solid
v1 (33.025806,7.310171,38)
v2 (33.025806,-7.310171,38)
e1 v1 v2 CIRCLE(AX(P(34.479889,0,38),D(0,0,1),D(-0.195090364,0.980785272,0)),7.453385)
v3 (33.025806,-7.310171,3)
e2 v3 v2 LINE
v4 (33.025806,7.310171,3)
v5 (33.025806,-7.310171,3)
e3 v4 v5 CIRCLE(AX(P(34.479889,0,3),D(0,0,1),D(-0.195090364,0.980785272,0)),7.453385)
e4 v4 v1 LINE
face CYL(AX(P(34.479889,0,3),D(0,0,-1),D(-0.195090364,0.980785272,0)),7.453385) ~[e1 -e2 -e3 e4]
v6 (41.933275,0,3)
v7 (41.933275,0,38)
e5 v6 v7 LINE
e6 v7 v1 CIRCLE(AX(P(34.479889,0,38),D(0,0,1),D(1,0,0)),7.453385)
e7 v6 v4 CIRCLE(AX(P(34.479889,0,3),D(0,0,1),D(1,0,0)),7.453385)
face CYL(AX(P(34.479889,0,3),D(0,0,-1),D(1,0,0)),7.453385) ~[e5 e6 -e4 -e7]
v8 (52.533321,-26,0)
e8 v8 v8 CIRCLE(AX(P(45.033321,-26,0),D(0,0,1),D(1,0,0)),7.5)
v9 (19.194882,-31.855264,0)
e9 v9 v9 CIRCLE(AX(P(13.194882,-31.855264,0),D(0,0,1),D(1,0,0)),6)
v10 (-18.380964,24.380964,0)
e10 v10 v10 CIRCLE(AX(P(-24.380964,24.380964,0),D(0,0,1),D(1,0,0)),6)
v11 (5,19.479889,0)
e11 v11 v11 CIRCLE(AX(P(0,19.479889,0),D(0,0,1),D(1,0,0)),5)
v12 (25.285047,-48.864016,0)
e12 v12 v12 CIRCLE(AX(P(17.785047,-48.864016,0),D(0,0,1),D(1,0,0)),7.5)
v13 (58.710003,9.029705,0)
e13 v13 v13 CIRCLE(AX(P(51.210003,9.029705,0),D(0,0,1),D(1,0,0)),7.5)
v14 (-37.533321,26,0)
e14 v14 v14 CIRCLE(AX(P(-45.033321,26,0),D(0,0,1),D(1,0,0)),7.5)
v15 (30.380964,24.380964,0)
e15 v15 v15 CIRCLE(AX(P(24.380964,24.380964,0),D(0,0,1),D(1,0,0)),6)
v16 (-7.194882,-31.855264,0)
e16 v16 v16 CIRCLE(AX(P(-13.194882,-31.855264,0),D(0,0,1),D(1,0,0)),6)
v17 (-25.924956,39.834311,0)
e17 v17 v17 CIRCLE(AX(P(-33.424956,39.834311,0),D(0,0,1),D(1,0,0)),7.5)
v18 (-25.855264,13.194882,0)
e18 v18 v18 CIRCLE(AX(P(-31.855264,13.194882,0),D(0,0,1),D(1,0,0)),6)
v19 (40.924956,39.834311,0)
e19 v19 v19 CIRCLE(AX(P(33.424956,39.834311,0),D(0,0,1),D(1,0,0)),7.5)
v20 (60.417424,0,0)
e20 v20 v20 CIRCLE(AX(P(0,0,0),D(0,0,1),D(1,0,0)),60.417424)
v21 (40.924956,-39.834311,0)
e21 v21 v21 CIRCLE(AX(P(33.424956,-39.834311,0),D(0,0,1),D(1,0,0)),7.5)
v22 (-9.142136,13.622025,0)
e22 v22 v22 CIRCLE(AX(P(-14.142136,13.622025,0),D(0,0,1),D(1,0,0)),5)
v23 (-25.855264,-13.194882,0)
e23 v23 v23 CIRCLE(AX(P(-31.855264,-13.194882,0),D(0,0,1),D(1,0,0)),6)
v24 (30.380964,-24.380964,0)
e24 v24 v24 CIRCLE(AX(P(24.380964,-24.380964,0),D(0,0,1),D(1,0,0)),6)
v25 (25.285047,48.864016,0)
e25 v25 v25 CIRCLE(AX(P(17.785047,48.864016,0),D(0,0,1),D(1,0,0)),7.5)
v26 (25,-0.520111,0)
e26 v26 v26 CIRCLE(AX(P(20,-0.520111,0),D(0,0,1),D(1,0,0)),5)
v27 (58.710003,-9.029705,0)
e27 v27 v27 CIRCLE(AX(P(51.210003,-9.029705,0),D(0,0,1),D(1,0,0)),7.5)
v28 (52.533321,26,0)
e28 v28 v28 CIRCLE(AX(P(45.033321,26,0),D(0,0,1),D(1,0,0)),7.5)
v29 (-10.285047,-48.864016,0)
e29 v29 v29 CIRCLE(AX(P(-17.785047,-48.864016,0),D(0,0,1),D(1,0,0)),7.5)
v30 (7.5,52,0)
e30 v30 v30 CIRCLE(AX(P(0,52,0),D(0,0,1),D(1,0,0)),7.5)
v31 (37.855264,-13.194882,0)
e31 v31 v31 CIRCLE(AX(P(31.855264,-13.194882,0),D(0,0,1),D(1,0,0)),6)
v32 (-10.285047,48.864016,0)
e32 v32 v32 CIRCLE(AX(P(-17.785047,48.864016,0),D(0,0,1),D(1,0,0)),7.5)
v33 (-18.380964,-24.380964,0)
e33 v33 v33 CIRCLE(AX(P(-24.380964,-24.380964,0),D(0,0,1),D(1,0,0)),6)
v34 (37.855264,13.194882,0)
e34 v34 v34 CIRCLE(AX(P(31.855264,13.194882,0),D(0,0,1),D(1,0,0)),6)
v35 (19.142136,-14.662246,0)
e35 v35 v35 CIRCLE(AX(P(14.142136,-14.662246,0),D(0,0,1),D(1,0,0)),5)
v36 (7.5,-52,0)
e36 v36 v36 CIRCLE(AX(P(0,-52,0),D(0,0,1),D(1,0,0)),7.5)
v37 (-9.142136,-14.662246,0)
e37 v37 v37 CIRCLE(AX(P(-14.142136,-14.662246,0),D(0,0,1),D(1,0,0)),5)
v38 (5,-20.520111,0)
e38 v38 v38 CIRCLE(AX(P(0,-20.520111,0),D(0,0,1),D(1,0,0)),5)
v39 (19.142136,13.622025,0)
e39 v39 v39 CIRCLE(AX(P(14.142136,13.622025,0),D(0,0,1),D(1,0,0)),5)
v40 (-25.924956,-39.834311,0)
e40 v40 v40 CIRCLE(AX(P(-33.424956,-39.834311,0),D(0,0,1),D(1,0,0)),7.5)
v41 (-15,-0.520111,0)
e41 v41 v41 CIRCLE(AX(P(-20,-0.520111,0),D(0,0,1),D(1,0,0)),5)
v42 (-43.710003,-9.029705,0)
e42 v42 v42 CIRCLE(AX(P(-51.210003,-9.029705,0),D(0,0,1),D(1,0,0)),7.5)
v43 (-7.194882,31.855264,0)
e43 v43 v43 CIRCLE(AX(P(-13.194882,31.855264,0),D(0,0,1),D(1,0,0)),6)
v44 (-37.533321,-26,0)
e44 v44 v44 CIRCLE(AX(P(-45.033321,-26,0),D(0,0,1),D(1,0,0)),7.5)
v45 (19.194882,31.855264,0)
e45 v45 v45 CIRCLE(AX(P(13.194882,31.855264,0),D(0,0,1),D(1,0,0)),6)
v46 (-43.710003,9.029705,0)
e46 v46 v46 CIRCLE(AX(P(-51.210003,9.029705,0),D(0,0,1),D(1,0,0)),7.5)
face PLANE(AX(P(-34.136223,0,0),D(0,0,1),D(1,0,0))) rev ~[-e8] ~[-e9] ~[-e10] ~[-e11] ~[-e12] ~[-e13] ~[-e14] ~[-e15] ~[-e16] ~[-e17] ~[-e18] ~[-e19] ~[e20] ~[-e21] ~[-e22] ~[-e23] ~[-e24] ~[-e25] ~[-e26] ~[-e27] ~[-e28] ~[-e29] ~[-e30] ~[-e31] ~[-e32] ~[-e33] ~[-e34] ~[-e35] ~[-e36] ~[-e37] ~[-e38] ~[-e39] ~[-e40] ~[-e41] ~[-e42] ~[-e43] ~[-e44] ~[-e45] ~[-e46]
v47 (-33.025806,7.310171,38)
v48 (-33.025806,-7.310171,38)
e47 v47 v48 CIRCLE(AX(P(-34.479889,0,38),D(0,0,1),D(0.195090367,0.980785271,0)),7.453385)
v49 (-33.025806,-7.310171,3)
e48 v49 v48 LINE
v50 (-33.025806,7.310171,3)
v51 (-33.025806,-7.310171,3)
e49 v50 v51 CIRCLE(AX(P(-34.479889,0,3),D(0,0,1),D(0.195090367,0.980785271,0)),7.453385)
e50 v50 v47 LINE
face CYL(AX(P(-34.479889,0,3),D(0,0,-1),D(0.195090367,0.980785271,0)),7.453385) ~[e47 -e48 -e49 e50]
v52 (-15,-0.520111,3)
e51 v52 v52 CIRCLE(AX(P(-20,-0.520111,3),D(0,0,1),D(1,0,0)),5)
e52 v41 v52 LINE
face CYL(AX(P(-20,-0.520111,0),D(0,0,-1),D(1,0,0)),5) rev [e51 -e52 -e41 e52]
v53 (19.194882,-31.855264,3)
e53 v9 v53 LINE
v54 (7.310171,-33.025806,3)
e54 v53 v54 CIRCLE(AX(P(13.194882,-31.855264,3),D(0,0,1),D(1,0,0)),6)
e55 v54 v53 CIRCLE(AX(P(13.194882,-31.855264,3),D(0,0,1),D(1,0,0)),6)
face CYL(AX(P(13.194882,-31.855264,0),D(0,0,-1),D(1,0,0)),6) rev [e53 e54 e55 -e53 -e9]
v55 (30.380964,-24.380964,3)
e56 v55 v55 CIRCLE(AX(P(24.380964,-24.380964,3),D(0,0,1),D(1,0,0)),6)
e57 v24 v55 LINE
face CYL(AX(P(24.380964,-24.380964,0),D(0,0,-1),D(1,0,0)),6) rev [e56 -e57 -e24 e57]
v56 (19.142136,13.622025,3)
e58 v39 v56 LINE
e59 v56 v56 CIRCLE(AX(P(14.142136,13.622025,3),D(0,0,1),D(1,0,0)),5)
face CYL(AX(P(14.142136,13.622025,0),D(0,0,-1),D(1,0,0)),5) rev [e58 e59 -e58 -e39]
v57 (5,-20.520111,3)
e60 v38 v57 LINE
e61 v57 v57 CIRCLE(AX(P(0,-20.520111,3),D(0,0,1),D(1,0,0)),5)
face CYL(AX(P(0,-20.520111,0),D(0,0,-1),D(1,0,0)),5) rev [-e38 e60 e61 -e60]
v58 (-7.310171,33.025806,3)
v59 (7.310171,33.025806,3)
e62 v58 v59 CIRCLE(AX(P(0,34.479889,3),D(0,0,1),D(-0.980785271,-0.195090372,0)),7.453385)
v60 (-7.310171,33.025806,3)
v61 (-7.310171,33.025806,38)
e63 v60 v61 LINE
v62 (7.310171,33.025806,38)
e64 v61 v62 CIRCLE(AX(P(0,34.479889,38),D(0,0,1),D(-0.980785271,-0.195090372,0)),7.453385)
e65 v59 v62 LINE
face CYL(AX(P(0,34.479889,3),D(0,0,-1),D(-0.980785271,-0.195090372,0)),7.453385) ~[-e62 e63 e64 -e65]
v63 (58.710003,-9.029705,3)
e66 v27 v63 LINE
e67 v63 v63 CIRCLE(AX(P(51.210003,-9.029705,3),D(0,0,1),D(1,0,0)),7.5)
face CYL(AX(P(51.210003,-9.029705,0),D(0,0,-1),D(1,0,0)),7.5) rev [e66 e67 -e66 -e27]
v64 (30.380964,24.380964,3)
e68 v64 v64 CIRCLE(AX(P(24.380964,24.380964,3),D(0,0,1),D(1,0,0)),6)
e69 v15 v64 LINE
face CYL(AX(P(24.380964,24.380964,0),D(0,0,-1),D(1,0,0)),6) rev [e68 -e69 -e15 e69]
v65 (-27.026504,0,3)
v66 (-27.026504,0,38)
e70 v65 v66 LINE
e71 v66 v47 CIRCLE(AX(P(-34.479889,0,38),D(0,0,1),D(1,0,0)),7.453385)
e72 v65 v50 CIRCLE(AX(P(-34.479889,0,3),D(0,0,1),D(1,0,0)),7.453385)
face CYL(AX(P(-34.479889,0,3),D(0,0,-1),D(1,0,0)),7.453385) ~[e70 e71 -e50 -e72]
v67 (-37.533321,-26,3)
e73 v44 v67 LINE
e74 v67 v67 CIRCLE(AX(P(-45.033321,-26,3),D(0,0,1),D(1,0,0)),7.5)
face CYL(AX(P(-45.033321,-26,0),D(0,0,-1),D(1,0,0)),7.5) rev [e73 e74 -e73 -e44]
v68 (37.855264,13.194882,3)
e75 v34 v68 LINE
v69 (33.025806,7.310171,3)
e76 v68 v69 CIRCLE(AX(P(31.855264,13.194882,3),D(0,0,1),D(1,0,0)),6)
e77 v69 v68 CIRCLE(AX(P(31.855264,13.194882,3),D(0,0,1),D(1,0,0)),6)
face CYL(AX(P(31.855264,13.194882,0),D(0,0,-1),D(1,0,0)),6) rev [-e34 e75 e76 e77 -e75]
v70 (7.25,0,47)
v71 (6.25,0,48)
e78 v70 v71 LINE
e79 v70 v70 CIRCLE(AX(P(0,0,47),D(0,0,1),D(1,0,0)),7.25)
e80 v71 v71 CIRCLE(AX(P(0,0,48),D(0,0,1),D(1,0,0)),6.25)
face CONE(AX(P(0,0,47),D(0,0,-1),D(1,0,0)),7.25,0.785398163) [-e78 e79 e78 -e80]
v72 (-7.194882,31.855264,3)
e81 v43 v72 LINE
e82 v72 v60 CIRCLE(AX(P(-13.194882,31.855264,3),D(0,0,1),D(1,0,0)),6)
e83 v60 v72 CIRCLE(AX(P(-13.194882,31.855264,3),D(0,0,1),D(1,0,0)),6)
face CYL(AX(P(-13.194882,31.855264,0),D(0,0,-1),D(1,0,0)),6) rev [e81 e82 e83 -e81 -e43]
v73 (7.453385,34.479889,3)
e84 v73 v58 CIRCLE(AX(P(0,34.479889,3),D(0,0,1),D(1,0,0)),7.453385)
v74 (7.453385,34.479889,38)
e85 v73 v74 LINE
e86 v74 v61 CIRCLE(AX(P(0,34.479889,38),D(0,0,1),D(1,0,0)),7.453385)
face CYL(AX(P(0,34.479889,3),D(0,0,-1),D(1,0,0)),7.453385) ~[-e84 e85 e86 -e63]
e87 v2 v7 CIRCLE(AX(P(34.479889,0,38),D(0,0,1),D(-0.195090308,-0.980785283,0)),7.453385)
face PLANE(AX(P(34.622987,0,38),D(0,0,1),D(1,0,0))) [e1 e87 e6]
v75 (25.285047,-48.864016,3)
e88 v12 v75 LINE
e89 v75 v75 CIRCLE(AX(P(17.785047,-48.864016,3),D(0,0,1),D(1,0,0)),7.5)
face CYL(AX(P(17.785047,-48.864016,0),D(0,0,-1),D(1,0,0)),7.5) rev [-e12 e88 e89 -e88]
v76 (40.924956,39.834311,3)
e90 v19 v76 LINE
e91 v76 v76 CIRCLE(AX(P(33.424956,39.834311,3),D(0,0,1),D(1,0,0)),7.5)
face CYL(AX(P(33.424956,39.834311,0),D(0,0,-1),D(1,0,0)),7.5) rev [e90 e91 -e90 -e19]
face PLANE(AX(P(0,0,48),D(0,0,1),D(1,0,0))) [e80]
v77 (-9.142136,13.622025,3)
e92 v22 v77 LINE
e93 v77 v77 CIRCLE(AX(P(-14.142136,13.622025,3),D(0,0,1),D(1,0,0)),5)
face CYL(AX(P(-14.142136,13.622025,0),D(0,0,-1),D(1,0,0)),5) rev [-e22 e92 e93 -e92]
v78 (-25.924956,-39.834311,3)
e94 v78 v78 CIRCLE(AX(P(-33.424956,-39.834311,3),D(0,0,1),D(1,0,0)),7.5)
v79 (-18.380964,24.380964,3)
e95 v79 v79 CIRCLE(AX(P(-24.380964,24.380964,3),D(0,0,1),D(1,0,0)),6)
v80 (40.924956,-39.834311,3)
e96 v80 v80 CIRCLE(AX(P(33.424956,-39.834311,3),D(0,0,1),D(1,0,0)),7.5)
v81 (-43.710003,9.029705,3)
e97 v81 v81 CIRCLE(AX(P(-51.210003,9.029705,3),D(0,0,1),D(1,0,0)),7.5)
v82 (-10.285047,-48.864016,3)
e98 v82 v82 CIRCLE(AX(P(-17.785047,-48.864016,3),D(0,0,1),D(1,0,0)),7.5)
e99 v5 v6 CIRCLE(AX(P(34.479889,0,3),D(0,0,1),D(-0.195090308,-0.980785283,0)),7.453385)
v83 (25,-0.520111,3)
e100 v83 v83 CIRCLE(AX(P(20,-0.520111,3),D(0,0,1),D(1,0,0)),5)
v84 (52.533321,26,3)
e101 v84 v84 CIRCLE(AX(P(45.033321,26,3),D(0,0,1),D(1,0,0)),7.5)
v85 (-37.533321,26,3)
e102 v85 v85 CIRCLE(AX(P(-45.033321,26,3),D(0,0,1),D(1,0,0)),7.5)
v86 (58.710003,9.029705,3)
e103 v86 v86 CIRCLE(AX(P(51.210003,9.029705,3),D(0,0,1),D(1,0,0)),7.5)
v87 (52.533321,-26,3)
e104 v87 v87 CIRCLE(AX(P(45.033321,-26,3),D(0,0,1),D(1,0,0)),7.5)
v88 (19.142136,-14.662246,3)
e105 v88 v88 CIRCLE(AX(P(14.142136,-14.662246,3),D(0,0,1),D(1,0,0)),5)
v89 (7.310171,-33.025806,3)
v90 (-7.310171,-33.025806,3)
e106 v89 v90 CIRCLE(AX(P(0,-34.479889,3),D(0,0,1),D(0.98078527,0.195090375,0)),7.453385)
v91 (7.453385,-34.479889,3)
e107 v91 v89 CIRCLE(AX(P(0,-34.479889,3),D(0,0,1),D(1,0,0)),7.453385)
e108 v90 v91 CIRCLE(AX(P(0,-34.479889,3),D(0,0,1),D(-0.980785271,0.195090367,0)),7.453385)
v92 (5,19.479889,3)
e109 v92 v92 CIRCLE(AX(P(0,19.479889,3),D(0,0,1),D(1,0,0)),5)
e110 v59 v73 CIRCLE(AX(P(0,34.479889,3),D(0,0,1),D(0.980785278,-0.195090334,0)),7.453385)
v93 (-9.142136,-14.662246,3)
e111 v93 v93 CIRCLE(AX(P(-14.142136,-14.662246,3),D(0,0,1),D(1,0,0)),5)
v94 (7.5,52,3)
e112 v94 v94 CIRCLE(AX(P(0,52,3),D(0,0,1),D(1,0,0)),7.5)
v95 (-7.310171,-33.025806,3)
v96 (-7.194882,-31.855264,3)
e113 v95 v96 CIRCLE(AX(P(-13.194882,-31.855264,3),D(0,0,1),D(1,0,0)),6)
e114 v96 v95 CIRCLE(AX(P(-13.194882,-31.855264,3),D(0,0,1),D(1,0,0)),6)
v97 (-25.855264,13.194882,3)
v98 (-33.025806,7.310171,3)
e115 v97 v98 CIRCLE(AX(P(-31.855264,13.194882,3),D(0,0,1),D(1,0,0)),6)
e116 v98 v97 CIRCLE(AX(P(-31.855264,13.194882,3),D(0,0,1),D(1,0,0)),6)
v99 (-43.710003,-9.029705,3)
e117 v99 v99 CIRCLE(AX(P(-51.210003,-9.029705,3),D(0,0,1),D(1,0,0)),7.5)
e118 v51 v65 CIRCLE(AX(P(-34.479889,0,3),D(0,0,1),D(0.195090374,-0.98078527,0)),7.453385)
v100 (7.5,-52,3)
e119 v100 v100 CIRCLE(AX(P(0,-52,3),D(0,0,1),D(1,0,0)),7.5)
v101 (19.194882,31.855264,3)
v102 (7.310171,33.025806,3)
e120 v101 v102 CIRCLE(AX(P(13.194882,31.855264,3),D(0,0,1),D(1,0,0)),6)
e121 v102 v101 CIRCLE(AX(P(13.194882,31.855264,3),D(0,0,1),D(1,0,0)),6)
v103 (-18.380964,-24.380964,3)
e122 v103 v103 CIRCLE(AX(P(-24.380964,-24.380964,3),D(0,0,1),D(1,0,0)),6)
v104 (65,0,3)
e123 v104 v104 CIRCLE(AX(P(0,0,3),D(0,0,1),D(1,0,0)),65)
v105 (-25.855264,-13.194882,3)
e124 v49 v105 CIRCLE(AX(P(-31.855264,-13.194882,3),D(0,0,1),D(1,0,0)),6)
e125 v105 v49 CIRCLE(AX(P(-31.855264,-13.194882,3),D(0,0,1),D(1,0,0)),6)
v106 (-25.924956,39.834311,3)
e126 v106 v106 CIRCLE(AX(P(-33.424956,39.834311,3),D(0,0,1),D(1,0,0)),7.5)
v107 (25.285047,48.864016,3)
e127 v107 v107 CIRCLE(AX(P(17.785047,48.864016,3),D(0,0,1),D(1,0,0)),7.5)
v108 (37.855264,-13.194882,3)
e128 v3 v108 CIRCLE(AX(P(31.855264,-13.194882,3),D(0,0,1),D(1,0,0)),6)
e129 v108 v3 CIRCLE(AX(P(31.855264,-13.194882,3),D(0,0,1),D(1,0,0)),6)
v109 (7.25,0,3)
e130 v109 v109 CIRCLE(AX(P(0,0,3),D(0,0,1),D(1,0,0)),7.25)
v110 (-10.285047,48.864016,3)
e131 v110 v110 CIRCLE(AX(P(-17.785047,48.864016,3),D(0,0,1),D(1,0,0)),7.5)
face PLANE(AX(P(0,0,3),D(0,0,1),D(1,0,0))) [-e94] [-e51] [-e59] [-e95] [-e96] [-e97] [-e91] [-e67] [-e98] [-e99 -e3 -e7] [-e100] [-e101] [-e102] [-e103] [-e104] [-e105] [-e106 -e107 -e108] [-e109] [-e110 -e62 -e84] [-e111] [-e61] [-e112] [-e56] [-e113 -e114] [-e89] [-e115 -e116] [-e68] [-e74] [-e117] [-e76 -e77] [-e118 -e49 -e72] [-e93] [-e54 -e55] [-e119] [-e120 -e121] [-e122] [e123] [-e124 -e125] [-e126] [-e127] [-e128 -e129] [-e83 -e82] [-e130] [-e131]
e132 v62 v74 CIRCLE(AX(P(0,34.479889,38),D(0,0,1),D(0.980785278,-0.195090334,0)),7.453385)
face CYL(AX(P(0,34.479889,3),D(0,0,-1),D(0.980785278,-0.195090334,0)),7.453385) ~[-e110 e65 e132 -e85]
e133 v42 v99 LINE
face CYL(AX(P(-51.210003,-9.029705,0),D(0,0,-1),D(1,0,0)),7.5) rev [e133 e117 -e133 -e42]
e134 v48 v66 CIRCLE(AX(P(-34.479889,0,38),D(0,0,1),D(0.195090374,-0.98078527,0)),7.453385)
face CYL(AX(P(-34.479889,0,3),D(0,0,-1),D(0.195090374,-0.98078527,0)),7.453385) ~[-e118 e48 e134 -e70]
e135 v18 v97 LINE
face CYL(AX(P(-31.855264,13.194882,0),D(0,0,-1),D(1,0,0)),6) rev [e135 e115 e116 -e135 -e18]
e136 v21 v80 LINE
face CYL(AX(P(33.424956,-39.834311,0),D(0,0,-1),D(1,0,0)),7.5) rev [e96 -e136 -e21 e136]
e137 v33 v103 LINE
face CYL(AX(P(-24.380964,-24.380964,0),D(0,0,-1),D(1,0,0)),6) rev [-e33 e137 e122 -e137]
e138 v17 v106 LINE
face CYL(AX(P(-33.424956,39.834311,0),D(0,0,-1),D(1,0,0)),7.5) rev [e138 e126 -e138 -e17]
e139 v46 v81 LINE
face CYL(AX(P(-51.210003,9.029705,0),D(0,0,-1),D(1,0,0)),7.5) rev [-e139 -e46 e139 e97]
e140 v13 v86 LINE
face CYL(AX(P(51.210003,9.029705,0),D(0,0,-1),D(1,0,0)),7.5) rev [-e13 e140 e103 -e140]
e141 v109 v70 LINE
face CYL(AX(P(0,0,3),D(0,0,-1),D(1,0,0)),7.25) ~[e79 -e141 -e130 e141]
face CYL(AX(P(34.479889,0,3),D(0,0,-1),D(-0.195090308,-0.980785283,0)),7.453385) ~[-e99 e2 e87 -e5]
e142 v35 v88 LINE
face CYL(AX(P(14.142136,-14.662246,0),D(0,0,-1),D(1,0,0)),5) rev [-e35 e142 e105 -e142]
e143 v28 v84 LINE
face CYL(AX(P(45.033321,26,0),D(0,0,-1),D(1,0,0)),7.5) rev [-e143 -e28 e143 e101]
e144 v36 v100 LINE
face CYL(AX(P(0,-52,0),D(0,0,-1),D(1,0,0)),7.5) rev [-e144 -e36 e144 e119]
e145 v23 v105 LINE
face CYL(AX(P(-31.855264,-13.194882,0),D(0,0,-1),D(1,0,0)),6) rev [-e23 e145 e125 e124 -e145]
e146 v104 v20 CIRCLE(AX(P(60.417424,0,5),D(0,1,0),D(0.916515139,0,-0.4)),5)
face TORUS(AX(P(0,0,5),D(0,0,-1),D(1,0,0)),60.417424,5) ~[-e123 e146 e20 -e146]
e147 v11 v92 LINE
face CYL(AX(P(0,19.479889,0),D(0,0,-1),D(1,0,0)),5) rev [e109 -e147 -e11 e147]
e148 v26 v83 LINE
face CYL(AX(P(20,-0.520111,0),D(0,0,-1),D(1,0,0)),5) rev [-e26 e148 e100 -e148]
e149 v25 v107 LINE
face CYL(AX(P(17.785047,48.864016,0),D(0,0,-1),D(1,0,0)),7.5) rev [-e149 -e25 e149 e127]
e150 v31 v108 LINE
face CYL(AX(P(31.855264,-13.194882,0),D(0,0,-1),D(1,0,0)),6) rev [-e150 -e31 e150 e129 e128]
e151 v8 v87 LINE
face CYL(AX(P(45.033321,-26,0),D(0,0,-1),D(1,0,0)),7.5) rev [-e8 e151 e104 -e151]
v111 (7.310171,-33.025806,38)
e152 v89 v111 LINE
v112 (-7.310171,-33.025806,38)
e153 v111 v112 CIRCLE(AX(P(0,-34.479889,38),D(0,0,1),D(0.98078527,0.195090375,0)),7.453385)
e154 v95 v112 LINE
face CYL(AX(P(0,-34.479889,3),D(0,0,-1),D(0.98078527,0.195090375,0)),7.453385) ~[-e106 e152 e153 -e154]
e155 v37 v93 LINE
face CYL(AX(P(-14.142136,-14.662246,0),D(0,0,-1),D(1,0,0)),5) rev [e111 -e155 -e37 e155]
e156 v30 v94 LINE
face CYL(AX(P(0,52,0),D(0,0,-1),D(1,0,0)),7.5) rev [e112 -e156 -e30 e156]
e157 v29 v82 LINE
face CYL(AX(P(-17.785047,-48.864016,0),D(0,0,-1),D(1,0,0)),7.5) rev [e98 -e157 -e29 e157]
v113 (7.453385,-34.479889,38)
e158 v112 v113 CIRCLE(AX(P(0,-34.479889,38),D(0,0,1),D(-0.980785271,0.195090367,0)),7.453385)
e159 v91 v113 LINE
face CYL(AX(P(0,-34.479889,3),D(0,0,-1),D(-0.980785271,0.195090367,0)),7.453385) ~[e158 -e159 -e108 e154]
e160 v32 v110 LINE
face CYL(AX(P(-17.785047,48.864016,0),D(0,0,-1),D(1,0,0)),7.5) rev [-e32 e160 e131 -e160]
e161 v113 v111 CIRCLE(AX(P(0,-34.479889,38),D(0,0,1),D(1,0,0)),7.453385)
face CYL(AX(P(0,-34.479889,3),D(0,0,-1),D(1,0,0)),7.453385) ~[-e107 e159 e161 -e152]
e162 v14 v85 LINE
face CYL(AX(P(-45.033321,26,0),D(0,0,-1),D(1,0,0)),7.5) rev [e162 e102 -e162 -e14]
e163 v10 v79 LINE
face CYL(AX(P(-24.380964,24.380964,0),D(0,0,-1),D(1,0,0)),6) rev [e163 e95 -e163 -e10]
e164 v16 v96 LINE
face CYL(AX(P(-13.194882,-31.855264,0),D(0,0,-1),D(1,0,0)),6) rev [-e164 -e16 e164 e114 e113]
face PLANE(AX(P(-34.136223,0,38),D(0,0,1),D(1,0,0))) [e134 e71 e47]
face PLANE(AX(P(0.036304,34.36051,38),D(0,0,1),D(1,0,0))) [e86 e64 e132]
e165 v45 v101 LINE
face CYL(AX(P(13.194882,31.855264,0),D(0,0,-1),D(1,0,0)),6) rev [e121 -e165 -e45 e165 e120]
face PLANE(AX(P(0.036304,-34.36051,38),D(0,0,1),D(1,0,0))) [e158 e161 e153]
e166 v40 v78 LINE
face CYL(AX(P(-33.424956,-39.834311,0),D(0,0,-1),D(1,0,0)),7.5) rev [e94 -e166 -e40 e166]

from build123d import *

# Parameters (mm, degrees)
F0_R     = 65
F0_R_2   = 7.5
F0_R_3   = 6
F0_R_4   = 5
F1_DEPTH = 3
F2_R     = 7.25
F3_DEPTH = 45
F4_SIZE  = 1
F5_R     = 6
F6_DEPTH = 35
F7_DEPTH = 3


# Not quite as in the source:
# - a fillet or chamfer that OpenCascade refuses, or shapes differently, is made with other operations: its cross-section is extruded or revolved along the edge and cut away or added


with BuildPart() as f1:
    # F0 (on Top) → F1 (new body)
    with BuildSketch(Plane.XY):
        Circle(F0_R)
        with Locations((-33.4249557037, -39.8343110422)):
            Circle(F0_R_2, mode=Mode.SUBTRACT)
        with Locations((-17.7850474529, -48.8640162809)):
            Circle(F0_R_2, mode=Mode.SUBTRACT)
        with Locations((-45.0333209968, -26)):
            Circle(F0_R_2, mode=Mode.SUBTRACT)
        with Locations((-51.2100031566, -9.0297052387)):
            Circle(F0_R_2, mode=Mode.SUBTRACT)
        with Locations((-24.3809636253, -24.3809636253)):
            Circle(F0_R_3, mode=Mode.SUBTRACT)
        with Locations((-13.1948824318, -31.8552641208)):
            Circle(F0_R_3, mode=Mode.SUBTRACT)
        with Locations((-31.8552641208, -13.1948824318)):
            Circle(F0_R_3, mode=Mode.SUBTRACT)
        with Locations((-20, -0.5201105773)):
            Circle(F0_R_4, mode=Mode.SUBTRACT)
        with Locations((-14.1421356237, -14.6622462011)):
            Circle(F0_R_4, mode=Mode.SUBTRACT)
        with Locations((0, -52)):
            Circle(F0_R_2, mode=Mode.SUBTRACT)
        with Locations((17.7850474529, -48.8640162809)):
            Circle(F0_R_2, mode=Mode.SUBTRACT)
        with Locations((0, -34.4798894227)):
            Circle(F0_R_3, mode=Mode.SUBTRACT)
        with Locations((33.4249557037, -39.8343110422)):
            Circle(F0_R_2, mode=Mode.SUBTRACT)
        with Locations((13.1948824318, -31.8552641208)):
            Circle(F0_R_3, mode=Mode.SUBTRACT)
        with Locations((0, -20.5201105773)):
            Circle(F0_R_4, mode=Mode.SUBTRACT)
        with Locations((24.3809636253, -24.3809636253)):
            Circle(F0_R_3, mode=Mode.SUBTRACT)
        with Locations((14.1421356237, -14.6622462011)):
            Circle(F0_R_4, mode=Mode.SUBTRACT)
        with Locations((31.8552641208, -13.1948824318)):
            Circle(F0_R_3, mode=Mode.SUBTRACT)
        with Locations((20, -0.5201105773)):
            Circle(F0_R_4, mode=Mode.SUBTRACT)
        with Locations((45.0333209968, -26)):
            Circle(F0_R_2, mode=Mode.SUBTRACT)
        with Locations((51.2100031566, -9.0297052387)):
            Circle(F0_R_2, mode=Mode.SUBTRACT)
        with Locations((-51.2100031566, 9.0297052387)):
            Circle(F0_R_2, mode=Mode.SUBTRACT)
        with Locations((-34.4798894227, 0)):
            Circle(F0_R_3, mode=Mode.SUBTRACT)
        with Locations((-45.0333209968, 26)):
            Circle(F0_R_2, mode=Mode.SUBTRACT)
        with Locations((-31.8552641208, 13.1948824318)):
            Circle(F0_R_3, mode=Mode.SUBTRACT)
        with Locations((-14.1421356237, 13.6220250464)):
            Circle(F0_R_4, mode=Mode.SUBTRACT)
        with Locations((-24.3809636253, 24.3809636253)):
            Circle(F0_R_3, mode=Mode.SUBTRACT)
        with Locations((-13.1948824318, 31.8552641208)):
            Circle(F0_R_3, mode=Mode.SUBTRACT)
        with Locations((-33.4249557037, 39.8343110422)):
            Circle(F0_R_2, mode=Mode.SUBTRACT)
        with Locations((-17.7850474529, 48.8640162809)):
            Circle(F0_R_2, mode=Mode.SUBTRACT)
        with Locations((14.1421356237, 13.6220250464)):
            Circle(F0_R_4, mode=Mode.SUBTRACT)
        with Locations((31.8552641208, 13.1948824318)):
            Circle(F0_R_3, mode=Mode.SUBTRACT)
        with Locations((0, 19.4798894227)):
            Circle(F0_R_4, mode=Mode.SUBTRACT)
        with Locations((13.1948824318, 31.8552641208)):
            Circle(F0_R_3, mode=Mode.SUBTRACT)
        with Locations((24.3809636253, 24.3809636253)):
            Circle(F0_R_3, mode=Mode.SUBTRACT)
        with Locations((34.4798894227, 0)):
            Circle(F0_R_3, mode=Mode.SUBTRACT)
        with Locations((51.2100031566, 9.0297052387)):
            Circle(F0_R_2, mode=Mode.SUBTRACT)
        with Locations((45.0333209968, 26)):
            Circle(F0_R_2, mode=Mode.SUBTRACT)
        with Locations((0, 34.4798894227)):
            Circle(F0_R_3, mode=Mode.SUBTRACT)
        with Locations((0, 52)):
            Circle(F0_R_2, mode=Mode.SUBTRACT)
        with Locations((17.7850474529, 48.8640162809)):
            Circle(F0_R_2, mode=Mode.SUBTRACT)
        with Locations((33.4249557037, 39.8343110422)):
            Circle(F0_R_2, mode=Mode.SUBTRACT)
    extrude(amount=F1_DEPTH)

    # F2 (on face) → F3 (join)
    with BuildSketch(Plane.XY.offset(3)):
        Circle(F2_R)
    extrude(amount=F3_DEPTH)

    # F4
    f4_edges = [f1.edges().sort_by_distance(p)[0] for p in [
        (-7.25, 0, 48),
    ]]
    chamfer(f4_edges, length=F4_SIZE)

    # F5 (on face) → F6 (join)
    with BuildSketch(Plane.XY.offset(3)):
        with BuildLine():
            ThreePointArc((7.3101707312, 33.0258059616), (7.4174953683, 33.7493298476), (7.4533854611, 34.4798894227))
            ThreePointArc((7.4533854611, 34.4798894227), (-0.7305597159, 41.8973847771), (-7.310170676, 33.0258056838))
            ThreePointArc((-7.310170676, 33.0258056838), (1.416e-07, 27.0265039616), (7.3101707312, 33.0258059616))
        make_face()
        with Locations((0, 34.4798894227)):
            Circle(F5_R, mode=Mode.SUBTRACT)
        with BuildLine():
            ThreePointArc((-33.0258056652, -7.3101706723), (-28.7183444229, -4.728377528), (-27.0265039616, 0))
            ThreePointArc((-27.0265039616, 0), (-28.7183444392, 4.7283775479), (-33.0258057157, 7.3101706823))
            ThreePointArc((-33.0258057157, 7.3101706823), (-41.9332748837, -2.58e-08), (-33.0258056652, -7.3101706723))
        make_face()
        with Locations((-34.4798894227, 0)):
            Circle(F5_R, mode=Mode.SUBTRACT)
        with BuildLine():
            ThreePointArc((-7.310170682, -33.025805714), (-0.7305597006, -41.8973847786), (7.4533854611, -34.4798894227))
            ThreePointArc((7.4533854611, -34.4798894227), (7.4174953531, -33.7493296936), (7.3101706709, -33.0258056581))
            ThreePointArc((7.3101706709, -33.0258056581), (-2.85e-08, -27.0265039616), (-7.310170682, -33.025805714))
        make_face()
        with Locations((0, -34.4798894227)):
            Circle(F5_R, mode=Mode.SUBTRACT)
        with BuildLine():
            ThreePointArc((33.0258061581, -7.3101707703), (39.2082671449, -5.7615448403), (41.9332748837, 0))
            ThreePointArc((41.9332748837, 0), (39.208266979, 5.7615449765), (33.0258057371, 7.3101706866))
            ThreePointArc((33.0258057371, 7.3101706866), (27.0265039616, -2.146e-07), (33.0258061581, -7.3101707703))
        make_face()
        with Locations((34.4798894227, 0)):
            Circle(F5_R, mode=Mode.SUBTRACT)
        with Locations((-34.4798894227, 0)):
            Circle(F5_R)
        with Locations((0, -34.4798894227)):
            Circle(F5_R)
        with Locations((34.4798894227, 0)):
            Circle(F5_R)
        with Locations((0, 34.4798894227)):
            Circle(F5_R)
    extrude(amount=F6_DEPTH)

    # F7 (add, through all): faces of the model
    f7_faces = [f1.faces().sort_by_distance(p)[0] for p in [
        (-34.4798894227, 0, 3),
        (0, -34.4798894227, 3),
        (34.4798894227, 0, 3),
        (0, 34.4798894227, 3),
    ]]
    extrude(f7_faces, amount=F7_DEPTH)

    # F8: fillet of radius 5 on 1 edges, made by hand

    # F8_s1 → F8_t2 (revolve, cut)
    with BuildSketch(Plane.XZ):
        with BuildLine():
            ThreePointArc((65, 3), (63.1560370926, 0.8166998673), (60.417424305, 0))
            Line((60.417424305, 0), (65, 0))
            Line((65, 0), (65, 3))
        make_face()
    revolve(axis=Axis((0, 0, 0), (0, 0, 1)), mode=Mode.SUBTRACT)


solid = f1.part
